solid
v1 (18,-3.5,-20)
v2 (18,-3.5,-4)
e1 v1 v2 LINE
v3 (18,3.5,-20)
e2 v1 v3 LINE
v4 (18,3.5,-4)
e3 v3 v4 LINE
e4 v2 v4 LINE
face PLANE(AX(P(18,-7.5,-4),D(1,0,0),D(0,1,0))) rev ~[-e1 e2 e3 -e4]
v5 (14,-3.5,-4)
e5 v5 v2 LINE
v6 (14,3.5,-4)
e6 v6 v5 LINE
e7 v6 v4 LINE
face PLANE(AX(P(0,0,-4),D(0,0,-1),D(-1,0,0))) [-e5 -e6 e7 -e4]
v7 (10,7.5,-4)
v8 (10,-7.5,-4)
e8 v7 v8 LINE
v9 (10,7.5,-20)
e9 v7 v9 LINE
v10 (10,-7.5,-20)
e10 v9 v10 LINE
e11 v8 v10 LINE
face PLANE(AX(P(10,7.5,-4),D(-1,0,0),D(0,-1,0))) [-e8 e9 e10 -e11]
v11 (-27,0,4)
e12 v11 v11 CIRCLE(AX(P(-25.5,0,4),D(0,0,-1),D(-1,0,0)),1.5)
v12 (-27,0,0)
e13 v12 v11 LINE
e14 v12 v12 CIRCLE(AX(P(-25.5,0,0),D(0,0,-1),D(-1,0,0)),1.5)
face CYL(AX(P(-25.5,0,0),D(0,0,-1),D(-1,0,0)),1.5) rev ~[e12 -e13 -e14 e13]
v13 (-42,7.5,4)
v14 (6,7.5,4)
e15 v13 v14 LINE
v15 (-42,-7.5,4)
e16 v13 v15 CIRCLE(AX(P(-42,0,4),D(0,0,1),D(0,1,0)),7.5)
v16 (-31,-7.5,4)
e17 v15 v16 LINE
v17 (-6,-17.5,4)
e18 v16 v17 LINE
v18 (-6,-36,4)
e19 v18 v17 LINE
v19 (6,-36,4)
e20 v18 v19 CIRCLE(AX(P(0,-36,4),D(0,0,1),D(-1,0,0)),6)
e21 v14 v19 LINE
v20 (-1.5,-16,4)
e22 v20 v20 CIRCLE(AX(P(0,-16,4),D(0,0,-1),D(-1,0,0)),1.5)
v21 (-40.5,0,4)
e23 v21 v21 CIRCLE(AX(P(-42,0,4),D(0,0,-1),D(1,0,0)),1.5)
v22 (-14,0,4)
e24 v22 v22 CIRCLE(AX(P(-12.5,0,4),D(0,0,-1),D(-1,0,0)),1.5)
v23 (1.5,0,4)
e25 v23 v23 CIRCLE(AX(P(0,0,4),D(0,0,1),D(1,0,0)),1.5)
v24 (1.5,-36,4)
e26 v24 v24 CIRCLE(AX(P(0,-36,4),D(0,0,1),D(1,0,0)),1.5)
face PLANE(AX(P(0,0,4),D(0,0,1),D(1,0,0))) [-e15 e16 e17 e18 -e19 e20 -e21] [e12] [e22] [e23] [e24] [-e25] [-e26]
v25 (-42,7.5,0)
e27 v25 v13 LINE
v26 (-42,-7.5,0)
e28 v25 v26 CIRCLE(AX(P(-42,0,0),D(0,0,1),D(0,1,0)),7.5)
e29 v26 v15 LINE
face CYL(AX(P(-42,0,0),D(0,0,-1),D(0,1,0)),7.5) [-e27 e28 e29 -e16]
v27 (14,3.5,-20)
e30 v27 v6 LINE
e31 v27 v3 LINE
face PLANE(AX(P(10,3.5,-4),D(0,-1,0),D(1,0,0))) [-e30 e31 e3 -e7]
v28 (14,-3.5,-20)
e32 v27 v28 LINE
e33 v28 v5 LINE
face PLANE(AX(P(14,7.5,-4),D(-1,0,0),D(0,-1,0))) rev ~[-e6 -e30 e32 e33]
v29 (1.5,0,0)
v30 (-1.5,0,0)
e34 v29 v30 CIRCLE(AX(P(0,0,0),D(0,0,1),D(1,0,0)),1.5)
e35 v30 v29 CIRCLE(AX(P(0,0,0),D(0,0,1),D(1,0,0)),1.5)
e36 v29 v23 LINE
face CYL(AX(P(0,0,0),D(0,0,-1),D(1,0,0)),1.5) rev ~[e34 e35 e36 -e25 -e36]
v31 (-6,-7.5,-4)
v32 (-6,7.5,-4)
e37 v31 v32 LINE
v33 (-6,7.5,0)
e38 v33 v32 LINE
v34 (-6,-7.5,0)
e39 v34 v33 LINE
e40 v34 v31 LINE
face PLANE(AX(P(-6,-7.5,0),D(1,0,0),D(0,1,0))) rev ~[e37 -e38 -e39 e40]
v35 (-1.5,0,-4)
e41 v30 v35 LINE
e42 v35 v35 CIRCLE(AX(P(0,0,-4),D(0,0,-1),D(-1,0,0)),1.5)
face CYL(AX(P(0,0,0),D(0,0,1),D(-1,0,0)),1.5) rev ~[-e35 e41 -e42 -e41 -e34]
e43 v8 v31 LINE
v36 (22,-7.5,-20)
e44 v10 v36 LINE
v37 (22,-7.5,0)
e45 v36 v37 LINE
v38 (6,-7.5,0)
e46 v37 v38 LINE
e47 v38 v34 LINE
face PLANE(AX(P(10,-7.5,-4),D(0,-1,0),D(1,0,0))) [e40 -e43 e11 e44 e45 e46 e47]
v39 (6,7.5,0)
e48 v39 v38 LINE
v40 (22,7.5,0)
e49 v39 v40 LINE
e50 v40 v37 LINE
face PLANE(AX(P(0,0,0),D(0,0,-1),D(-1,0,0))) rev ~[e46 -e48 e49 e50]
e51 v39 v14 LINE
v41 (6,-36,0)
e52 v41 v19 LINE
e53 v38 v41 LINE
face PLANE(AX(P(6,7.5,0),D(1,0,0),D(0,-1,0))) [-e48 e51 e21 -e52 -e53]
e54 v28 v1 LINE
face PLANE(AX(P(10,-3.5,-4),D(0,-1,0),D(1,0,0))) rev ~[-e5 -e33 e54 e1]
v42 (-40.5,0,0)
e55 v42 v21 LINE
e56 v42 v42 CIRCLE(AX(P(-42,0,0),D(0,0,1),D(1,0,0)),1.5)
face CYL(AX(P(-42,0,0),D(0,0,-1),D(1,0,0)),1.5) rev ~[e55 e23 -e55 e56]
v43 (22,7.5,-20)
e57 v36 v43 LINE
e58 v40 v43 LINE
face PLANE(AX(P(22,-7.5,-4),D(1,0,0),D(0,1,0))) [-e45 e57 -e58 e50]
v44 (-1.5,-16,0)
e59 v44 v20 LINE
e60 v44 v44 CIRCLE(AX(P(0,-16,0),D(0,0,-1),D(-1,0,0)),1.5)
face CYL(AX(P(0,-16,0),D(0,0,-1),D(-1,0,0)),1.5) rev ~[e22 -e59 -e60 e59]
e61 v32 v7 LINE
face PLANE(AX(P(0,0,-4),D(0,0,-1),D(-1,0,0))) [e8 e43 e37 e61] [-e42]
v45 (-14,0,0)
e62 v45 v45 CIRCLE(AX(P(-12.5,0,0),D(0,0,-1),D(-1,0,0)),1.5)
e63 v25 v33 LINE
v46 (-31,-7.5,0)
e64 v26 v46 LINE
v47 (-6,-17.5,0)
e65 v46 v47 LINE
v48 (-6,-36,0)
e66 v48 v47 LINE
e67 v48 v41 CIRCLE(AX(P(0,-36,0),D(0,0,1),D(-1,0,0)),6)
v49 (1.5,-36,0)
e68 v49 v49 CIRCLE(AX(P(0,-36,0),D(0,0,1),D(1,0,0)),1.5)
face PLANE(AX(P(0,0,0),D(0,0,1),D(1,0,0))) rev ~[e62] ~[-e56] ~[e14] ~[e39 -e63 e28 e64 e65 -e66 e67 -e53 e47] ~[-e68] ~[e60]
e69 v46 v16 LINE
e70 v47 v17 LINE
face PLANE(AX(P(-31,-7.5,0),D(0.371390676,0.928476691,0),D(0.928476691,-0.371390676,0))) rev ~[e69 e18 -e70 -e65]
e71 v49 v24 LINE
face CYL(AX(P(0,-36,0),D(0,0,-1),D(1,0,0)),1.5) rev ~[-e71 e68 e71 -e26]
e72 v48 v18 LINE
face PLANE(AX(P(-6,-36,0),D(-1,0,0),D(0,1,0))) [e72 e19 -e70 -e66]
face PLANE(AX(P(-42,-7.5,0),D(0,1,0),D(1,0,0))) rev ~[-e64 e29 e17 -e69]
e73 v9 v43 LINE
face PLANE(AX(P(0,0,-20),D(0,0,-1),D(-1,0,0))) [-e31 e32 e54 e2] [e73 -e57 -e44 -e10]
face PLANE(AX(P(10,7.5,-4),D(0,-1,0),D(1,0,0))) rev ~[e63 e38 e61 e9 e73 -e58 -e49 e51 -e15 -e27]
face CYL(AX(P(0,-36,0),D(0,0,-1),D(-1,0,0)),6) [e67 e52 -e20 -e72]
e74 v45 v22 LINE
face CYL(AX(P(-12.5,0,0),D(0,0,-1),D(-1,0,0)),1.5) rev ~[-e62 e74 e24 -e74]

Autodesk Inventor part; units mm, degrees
ref_plane "YZ Plane" through (0, 0, 0) normal (1, 0, 0) x (0, 1, 0)
ref_plane "XZ Plane" through (0, 0, 0) normal (0, 1, 0) x (-1, 0, 0)
ref_plane "XY Plane" through (0, 0, 0) normal (0, 0, 1) x (1, 0, 0)
sketch "Sketch1" plane through (0, 0, 0) normal (0, 0, 1) x (1, 0, 0)
  circle A0 centre (0, 0) radius 1.5
  circle A1 centre (-42, 0) radius 1.5
  circle A2 centre (0, -36) radius 1.5
  arc A3 (-42, 7.5) -> (-42, -7.5) centre (-42, 0) ccw
  line L0 (-42, 1.5) -> (-42, -1.5)
  arc A4 (-6, -36) -> (6, -36) centre (0, -36) ccw
  line L1 (-42, 7.5) -> (6, 7.5)
  line L2 (6, 7.5) -> (6, -36)
  line L3 (-6, -36) -> (-6, -17.5)
  line L4 (-42, -7.5) -> (-31, -7.5)
  line L5 (-31, -7.5) -> (-6, -17.5)
  dimension "d0" = 3
  dimension "d1" = 3
  dimension "d2" = 3
  dimension "d3" = 15
  dimension "d5" = 15
  dimension "d6" = 12
  dimension "d7" = 48
extrude "Extrusion1" add sketch "Sketch1" along normal blind 4
sketch "Sketch2" plane through (0, 0, 0) normal (0, 0, -1) x (-1, 0, 0)
  line L0 (6, 7.5) -> (-22, 7.5)
  line L1 (-22, -7.5) -> (6, -7.5)
  line L2 (6, -7.5) -> (6, 7.5)
  line L3 (-22, 7.5) -> (-22, -7.5)
  circle A0 centre (0, 0) radius 1.5
  dimension "d27" = 28
  dimension "d28" = 15
  dimension "d29" = 28
  dimension "d30" = 6
  dimension "d31" = 7.5
  dimension "d32" = 3
extrude "Extrusion4" add sketch "Sketch2" along normal blind 4
sketch "Sketch5" plane through (0, 0, -4) normal (0, 0, -1) x (-1, 0, 0)
  line L0 (-6, 7.5) -> (-22, 7.5) projected
  line L1 (-22, 7.5) -> (-10, 7.5)
  line L2 (-10, 7.5) -> (-10, -7.5)
  line L3 (-10, -7.5) -> (-22, -7.5)
  line L4 (-22, -7.5) -> (-22, 7.5)
  point P0 (0, 0)
  dimension "d35" = 12
  dimension "d36" = 15
extrude "Extrusion5" add sketch "Sketch5" along normal blind 16
shell "Shell2" thickness 4 removed faces 1 at (18, 2.5, -20)
sketch "Sketch6" plane through (0, 0, 0) normal (0, 0, -1) x (-1, 0, 0)
  circle A0 centre (12.5, 0) radius 1.5
  line L0 (6, 7.5) -> (-10, 7.5) projected
  point P0 (0, 0)
  dimension "d40" = 3
  dimension "d41" = 12.5
  dimension "d42" = 7.5
sketch "Sketch7" plane through (0, 0, 0) normal (0, 0, -1) x (-1, 0, 0)
  point P0 (0, 0)
extrude "Extrusion6" cut sketch "Sketch6" against normal through all
sketch "Sketch8" plane through (0, 0, 0) normal (0, 0, -1) x (-1, 0, 0)
  circle A0 centre (25.5, 0) radius 1.5
  circle A1 centre (12.5, 0) radius 1.5 projected
  line L0 (6, 7.5) -> (-10, 7.5) projected
  point P0 (0, 0)
  dimension "d45" = 3
  dimension "d46" = 13
  dimension "d47" = 7.5
extrude "Extrusion7" cut sketch "Sketch8" against normal through all contours A0
sketch "Sketch9" plane through (0, 0, 0) normal (0, 0, -1) x (-1, 0, 0)
  point P0 (0, 0)
sketch "Sketch10" plane through (0, 0, 0) normal (0, 0, -1) x (-1, 0, 0)
  circle A0 centre (0, -16) radius 1.5
  line L0 (6, -36) -> (6, -17.5) projected
  circle A1 centre (0, -36) radius 1.5 projected
  point P0 (0, 0)
  dimension "d50" = 3
  dimension "d51" = 6
  dimension "d52" = 20
extrude "Extrusion8" cut sketch "Sketch10" against normal through all contours A0
properties part number "Mounting Bracket 2of4 - Copy2"
